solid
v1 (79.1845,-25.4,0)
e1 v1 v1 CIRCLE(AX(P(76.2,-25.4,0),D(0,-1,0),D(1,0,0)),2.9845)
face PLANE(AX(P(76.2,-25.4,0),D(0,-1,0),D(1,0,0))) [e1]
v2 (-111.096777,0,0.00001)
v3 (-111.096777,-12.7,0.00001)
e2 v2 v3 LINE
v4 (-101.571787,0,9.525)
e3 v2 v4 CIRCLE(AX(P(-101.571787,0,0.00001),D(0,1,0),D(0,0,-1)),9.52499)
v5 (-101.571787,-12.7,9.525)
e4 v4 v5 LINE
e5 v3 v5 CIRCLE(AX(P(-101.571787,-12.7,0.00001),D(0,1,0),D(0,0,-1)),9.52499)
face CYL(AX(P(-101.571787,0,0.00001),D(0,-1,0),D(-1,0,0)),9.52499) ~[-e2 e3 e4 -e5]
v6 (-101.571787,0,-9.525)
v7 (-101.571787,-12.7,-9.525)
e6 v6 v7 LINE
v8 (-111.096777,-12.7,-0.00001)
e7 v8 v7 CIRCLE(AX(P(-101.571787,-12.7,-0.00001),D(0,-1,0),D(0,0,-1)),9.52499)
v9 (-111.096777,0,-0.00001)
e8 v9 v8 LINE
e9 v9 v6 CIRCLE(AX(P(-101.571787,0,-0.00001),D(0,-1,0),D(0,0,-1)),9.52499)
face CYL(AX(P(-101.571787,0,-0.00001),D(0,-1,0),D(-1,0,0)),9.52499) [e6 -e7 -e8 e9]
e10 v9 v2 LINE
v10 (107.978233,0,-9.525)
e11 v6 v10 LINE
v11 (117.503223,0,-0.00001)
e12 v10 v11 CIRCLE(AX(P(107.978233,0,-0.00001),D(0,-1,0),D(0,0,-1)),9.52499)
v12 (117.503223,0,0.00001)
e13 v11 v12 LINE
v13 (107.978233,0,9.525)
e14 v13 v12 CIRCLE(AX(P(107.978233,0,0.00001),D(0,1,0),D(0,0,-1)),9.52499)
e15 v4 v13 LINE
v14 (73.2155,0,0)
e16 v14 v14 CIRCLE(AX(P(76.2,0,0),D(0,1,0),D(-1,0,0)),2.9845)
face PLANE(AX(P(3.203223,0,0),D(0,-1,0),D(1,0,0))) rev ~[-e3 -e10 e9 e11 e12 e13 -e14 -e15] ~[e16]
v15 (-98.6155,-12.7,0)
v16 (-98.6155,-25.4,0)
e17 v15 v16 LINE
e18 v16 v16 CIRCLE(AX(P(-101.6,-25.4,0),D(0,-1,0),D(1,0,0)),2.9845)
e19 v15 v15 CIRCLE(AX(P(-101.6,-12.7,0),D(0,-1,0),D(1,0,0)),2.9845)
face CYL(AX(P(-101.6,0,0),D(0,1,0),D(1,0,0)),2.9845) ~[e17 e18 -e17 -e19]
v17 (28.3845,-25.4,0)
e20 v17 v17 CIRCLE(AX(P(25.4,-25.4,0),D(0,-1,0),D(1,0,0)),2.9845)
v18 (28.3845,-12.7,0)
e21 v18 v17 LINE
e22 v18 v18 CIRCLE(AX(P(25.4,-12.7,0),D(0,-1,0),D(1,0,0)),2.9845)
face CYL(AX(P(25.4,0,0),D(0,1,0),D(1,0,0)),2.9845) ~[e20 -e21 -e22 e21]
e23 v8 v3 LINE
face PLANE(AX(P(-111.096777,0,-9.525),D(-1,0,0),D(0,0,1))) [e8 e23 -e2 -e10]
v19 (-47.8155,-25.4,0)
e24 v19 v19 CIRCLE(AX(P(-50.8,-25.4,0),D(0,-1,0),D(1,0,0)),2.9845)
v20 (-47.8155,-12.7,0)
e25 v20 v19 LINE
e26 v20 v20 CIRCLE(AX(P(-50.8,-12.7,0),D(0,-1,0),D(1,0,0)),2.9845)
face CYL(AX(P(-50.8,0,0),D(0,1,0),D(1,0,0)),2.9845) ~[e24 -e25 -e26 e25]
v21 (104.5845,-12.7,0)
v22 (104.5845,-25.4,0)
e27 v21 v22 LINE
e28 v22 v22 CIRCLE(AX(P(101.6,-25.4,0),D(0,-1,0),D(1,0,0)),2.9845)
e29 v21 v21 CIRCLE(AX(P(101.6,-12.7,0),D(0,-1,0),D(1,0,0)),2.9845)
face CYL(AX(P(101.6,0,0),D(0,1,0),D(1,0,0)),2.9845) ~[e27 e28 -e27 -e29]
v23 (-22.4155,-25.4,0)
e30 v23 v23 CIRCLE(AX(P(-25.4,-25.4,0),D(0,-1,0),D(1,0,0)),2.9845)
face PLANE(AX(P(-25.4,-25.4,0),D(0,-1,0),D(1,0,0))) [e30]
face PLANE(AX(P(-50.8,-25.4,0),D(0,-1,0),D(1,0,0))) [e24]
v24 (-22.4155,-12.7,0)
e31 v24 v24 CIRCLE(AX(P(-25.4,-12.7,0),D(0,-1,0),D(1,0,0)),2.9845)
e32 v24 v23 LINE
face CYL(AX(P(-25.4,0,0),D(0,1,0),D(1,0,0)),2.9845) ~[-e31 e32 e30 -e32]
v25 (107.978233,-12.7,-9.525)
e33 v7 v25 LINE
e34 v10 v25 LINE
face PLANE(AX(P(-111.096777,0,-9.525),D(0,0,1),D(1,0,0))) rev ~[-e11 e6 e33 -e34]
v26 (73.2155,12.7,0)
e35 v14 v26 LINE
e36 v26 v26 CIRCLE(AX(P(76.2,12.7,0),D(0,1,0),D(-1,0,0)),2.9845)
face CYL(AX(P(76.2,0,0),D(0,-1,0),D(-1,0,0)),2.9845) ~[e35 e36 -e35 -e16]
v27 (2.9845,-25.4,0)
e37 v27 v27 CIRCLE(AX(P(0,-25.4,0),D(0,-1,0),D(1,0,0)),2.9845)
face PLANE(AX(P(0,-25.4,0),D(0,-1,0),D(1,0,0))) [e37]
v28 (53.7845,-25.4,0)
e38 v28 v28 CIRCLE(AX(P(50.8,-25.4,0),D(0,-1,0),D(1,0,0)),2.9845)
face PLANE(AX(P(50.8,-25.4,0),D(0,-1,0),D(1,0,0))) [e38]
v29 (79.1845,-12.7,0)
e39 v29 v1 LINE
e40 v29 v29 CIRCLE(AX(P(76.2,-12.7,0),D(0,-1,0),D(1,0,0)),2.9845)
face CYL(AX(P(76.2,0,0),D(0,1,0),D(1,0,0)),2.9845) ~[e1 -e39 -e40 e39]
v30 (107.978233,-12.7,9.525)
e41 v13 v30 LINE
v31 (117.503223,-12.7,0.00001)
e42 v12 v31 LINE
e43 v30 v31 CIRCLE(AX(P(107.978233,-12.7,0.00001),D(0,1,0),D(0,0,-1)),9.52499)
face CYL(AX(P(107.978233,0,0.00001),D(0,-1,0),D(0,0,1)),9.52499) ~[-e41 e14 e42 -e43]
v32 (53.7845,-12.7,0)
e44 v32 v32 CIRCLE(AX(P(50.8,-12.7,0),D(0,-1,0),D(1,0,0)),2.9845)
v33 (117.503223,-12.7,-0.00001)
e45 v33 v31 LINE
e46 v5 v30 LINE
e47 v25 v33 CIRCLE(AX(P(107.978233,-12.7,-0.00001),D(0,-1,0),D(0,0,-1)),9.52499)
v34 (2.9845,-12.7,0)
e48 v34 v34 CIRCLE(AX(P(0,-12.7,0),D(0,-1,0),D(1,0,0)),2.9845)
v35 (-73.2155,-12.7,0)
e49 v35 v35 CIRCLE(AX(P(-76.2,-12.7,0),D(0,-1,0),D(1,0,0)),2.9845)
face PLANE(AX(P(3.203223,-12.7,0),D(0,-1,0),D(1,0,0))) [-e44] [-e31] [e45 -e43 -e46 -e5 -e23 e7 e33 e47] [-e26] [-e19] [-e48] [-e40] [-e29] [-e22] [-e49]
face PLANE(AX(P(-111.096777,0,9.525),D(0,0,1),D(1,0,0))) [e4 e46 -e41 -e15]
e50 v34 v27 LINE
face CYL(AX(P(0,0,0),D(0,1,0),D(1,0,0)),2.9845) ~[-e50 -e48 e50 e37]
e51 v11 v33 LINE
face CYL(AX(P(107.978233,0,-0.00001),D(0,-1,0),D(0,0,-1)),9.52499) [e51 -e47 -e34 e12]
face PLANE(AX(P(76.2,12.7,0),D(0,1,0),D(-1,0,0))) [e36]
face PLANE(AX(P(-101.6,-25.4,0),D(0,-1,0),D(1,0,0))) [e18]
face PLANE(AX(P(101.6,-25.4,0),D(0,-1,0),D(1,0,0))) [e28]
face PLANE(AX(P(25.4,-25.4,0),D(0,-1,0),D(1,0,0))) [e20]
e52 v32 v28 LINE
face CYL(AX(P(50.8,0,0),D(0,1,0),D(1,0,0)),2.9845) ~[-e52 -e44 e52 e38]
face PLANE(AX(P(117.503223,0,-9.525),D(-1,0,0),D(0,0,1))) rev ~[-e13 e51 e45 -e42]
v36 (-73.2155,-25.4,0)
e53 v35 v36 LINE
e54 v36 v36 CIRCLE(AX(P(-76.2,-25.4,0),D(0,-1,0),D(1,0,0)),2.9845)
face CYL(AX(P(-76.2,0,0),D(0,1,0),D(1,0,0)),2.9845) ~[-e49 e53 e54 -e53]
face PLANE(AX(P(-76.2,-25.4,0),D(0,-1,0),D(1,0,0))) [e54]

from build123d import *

# Parameters (mm, degrees)
F0_W     = 228.6
F0_H     = 19.05
F0_R     = 2.9845
F1_DEPTH = 12.7
F2_DEPTH = 25.4
F3_R     = 2.9845
F4_DEPTH = 12.7
F5_R     = 9.52499


# Not quite as in the source:
# - a fillet or chamfer is up to 0.001 mm smaller than in the source, because OpenCascade refuses the exact size
# - a feature names something its author has since deleted; it is built from what else it names


with BuildPart() as f1:
    # F0 (on Front) → F1 (new body)
    with BuildSketch(Plane.XZ):
        with Locations((3.2032227146, 0)):
            Rectangle(F0_W, F0_H)
        with Locations((-101.6, 0)):
            Circle(F0_R, mode=Mode.SUBTRACT)
        with Locations((-76.2, 0)):
            Circle(F0_R, mode=Mode.SUBTRACT)
        with Locations((-50.8, 0)):
            Circle(F0_R, mode=Mode.SUBTRACT)
        with Locations((-25.4, 0)):
            Circle(F0_R, mode=Mode.SUBTRACT)
        Circle(F0_R, mode=Mode.SUBTRACT)
        with Locations((25.4, 0)):
            Circle(F0_R, mode=Mode.SUBTRACT)
        with Locations((50.8, 0)):
            Circle(F0_R, mode=Mode.SUBTRACT)
        with Locations((76.2, 0)):
            Circle(F0_R, mode=Mode.SUBTRACT)
        with Locations((101.6, 0)):
            Circle(F0_R, mode=Mode.SUBTRACT)
    extrude(amount=F1_DEPTH)

    # F0 (on Front) → F2 (join)
    with BuildSketch(Plane.XZ):
        Circle(F0_R)
        with Locations((-101.6, 0)):
            Circle(F0_R)
        with Locations((-76.2, 0)):
            Circle(F0_R)
        with Locations((-50.8, 0)):
            Circle(F0_R)
        with Locations((-25.4, 0)):
            Circle(F0_R)
        with Locations((25.4, 0)):
            Circle(F0_R)
        with Locations((50.8, 0)):
            Circle(F0_R)
        with Locations((76.2, 0)):
            Circle(F0_R)
        with Locations((101.6, 0)):
            Circle(F0_R)
    extrude(amount=F2_DEPTH)

    # F3 (on face) → F4 (join)
    with BuildSketch(Plane(origin=(0, 0, 0), x_dir=(-1, 0, 0), z_dir=(0, 1, 0))):
        with Locations((-76.2, 0)):
            Circle(F3_R)
    extrude(amount=F4_DEPTH)

    # F5 (radius 9.525 in the source; OpenCascade refuses exactly that, so slightly less here)
    f5_edges = [f1.edges().sort_by_distance(p)[0] for p in [
        (117.503223, -6.35, 9.525),
        (117.503223, -6.35, -9.525),
        (-111.096777, -6.35, 9.525),
        (-111.096777, -6.35, -9.525),
    ]]
    fillet(f5_edges, radius=F5_R)


solid = f1.part
